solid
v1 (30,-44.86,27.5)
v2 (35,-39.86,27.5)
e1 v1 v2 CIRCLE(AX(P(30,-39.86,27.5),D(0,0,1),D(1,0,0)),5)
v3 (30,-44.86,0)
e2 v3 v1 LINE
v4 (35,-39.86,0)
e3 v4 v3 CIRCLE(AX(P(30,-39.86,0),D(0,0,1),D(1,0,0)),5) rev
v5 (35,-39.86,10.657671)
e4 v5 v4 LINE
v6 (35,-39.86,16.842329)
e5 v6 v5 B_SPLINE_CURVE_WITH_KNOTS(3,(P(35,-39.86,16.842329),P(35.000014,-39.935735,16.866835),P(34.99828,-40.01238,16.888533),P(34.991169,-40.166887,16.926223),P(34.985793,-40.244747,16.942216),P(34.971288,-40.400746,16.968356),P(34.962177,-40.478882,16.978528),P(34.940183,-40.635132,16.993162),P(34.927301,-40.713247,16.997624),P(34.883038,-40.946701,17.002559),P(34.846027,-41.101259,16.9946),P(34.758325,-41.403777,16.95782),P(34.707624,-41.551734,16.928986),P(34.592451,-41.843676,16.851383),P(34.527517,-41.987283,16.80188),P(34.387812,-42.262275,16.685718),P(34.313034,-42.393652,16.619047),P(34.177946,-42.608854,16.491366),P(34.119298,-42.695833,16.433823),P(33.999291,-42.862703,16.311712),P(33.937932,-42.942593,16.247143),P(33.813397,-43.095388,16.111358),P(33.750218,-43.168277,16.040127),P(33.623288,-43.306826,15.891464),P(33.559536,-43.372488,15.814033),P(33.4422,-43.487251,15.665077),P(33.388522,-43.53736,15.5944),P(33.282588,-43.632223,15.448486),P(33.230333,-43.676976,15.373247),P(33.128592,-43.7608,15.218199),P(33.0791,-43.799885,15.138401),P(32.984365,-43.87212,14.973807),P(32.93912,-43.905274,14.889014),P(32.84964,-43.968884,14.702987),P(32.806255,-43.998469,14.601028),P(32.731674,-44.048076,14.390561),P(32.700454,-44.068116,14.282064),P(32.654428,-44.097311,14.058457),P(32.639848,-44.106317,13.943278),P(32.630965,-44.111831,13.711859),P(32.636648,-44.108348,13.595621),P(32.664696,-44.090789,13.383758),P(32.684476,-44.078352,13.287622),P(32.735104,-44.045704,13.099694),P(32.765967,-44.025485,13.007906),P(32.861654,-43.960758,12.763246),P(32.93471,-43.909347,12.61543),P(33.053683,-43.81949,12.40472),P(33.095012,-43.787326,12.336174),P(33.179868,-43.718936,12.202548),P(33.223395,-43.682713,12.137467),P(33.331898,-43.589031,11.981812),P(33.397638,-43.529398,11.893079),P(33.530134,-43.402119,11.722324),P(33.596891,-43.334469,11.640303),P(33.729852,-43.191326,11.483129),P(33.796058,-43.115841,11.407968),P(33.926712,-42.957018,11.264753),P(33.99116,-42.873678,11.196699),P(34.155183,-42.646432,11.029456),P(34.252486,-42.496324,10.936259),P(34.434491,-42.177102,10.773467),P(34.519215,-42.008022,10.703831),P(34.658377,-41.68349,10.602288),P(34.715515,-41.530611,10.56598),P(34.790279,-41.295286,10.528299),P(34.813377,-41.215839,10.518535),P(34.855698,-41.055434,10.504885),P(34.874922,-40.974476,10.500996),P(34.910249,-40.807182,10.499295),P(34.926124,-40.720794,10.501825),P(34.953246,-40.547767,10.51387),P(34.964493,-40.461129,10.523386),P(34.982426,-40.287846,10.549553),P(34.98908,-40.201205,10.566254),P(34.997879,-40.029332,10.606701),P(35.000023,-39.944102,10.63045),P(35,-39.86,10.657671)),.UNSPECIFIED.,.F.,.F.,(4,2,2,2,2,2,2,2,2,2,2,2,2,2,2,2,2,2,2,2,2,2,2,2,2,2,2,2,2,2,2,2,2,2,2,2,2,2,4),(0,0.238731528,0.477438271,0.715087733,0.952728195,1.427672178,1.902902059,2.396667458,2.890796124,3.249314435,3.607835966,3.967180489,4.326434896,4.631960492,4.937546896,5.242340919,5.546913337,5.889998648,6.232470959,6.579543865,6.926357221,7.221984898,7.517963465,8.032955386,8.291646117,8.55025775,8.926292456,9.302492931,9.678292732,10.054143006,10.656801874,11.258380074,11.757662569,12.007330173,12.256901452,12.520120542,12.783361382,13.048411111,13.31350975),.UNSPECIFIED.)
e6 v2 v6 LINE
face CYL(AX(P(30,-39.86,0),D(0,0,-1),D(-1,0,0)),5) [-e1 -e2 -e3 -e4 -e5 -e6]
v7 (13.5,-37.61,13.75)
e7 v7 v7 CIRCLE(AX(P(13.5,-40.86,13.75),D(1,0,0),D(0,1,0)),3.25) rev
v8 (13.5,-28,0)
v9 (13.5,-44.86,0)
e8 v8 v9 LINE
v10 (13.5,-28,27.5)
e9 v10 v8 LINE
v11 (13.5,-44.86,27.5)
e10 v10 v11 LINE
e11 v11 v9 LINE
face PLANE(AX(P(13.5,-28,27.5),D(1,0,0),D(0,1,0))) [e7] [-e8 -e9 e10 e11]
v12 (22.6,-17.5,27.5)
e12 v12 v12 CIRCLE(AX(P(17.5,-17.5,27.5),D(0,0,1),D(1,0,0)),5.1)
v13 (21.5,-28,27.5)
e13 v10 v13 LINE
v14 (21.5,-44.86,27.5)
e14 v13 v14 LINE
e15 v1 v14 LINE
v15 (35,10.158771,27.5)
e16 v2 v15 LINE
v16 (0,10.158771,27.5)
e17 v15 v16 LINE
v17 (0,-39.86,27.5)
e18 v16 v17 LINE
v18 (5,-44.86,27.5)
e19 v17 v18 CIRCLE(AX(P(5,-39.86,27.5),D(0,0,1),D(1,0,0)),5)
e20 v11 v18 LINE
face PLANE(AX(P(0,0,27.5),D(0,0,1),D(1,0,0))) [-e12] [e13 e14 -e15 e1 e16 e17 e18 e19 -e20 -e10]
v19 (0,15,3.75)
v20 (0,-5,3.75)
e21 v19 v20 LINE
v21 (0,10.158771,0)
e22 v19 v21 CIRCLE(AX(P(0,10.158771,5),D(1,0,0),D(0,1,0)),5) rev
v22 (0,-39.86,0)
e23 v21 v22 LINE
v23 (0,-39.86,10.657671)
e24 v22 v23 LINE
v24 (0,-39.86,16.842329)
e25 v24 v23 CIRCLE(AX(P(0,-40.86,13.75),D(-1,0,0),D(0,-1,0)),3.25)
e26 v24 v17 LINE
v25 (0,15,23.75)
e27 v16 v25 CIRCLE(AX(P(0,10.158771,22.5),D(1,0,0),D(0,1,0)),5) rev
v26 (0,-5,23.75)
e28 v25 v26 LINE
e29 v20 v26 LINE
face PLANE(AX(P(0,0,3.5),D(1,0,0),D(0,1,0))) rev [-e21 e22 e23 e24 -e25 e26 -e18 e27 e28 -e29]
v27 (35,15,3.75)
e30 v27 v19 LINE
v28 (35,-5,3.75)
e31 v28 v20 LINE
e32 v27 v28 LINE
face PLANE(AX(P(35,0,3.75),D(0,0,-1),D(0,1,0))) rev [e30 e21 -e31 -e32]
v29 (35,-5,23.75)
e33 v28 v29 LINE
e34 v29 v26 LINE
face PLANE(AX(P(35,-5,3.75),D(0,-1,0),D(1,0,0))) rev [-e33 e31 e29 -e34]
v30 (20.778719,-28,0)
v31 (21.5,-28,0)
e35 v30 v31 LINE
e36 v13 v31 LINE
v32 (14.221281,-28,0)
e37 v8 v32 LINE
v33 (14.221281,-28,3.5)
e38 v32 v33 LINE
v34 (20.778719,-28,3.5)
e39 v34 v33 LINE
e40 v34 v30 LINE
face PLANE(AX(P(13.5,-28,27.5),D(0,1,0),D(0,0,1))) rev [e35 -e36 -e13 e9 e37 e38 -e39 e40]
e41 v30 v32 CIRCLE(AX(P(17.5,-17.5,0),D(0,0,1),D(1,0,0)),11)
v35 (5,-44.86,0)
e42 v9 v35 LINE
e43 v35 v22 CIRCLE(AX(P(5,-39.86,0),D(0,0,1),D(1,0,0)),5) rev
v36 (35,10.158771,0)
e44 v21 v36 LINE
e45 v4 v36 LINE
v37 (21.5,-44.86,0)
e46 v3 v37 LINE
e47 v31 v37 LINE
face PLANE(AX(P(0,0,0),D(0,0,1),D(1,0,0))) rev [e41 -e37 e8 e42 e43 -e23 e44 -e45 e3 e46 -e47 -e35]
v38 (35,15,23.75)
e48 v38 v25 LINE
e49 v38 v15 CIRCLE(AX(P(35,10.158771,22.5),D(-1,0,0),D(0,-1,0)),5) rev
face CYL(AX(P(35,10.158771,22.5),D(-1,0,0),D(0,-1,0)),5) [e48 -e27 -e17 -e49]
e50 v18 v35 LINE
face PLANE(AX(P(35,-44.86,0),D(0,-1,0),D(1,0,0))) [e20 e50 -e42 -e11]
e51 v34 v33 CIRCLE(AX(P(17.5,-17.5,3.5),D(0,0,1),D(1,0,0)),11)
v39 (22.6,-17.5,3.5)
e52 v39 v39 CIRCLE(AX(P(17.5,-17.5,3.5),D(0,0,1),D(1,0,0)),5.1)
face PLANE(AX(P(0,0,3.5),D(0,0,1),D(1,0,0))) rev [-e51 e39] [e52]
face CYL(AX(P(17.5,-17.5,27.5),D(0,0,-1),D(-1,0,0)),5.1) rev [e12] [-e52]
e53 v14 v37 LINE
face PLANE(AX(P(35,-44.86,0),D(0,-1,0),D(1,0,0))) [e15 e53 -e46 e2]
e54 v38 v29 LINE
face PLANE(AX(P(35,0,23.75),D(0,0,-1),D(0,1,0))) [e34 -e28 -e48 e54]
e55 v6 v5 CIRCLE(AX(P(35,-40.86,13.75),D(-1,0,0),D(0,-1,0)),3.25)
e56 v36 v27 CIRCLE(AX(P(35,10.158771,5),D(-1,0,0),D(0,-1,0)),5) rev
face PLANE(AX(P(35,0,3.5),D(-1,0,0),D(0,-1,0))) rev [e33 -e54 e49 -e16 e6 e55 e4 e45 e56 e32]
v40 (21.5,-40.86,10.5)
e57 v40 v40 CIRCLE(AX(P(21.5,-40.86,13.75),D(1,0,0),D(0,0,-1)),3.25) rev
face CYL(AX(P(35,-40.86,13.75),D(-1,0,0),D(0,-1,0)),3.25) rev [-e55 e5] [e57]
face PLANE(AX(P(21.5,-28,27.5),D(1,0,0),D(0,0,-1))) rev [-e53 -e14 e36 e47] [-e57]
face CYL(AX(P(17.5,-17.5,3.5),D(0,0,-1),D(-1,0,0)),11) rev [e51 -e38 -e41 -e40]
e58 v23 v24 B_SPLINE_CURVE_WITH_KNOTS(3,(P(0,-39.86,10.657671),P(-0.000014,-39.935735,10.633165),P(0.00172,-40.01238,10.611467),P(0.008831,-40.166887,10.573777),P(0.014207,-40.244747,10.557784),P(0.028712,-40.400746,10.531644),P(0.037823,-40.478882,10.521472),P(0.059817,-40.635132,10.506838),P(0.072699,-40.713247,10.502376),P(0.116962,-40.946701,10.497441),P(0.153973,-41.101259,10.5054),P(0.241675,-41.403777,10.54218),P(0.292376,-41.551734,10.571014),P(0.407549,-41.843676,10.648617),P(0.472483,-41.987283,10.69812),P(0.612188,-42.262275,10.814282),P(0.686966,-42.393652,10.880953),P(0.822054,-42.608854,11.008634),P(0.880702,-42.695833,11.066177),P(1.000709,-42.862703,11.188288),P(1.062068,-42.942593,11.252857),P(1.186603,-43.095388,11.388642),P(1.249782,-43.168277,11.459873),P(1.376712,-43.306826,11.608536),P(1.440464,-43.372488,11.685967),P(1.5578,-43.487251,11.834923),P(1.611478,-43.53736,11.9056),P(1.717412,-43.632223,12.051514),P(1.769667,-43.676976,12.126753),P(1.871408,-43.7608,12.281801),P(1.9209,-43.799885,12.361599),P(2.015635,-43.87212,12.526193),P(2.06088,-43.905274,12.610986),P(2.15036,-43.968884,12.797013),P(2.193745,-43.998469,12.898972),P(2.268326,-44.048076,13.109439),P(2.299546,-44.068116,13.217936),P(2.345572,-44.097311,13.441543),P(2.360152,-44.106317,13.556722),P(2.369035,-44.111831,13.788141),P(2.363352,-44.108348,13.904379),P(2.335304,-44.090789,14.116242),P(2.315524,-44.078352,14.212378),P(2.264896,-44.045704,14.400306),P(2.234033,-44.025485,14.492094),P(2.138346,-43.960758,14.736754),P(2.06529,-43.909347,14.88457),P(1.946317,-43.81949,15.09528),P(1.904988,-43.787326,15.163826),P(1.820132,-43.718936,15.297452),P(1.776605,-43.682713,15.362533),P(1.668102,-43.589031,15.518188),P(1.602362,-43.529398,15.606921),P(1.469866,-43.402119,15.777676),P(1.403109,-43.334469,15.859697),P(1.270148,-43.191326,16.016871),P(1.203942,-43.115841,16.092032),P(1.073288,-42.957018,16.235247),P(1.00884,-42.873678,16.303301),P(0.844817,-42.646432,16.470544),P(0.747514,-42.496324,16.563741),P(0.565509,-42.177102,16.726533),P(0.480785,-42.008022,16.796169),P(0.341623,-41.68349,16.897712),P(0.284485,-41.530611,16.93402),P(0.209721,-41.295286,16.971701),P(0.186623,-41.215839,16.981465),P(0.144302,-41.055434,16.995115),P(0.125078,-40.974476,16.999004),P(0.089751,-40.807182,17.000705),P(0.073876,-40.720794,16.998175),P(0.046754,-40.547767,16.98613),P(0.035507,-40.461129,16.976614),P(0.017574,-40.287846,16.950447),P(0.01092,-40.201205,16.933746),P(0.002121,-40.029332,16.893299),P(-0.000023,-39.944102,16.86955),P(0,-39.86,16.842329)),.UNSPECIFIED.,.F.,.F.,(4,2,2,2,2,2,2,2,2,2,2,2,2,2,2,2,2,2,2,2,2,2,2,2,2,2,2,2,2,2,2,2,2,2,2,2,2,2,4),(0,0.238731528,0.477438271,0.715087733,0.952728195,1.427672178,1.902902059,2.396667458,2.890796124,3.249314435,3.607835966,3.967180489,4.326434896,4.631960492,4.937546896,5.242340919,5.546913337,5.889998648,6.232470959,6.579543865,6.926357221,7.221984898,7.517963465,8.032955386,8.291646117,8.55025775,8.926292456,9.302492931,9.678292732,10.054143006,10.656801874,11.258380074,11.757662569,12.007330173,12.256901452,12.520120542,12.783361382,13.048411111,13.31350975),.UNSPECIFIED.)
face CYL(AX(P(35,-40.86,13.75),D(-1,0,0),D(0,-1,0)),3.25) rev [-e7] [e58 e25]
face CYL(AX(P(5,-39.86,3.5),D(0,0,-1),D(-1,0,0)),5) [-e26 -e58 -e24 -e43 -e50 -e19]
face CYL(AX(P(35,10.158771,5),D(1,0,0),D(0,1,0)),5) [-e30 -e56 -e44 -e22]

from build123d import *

# Parameters (mm, degrees)
CROQUIS1_W              = 35
CROQUIS1_H              = 35
CROQUIS1_R              = 11
ENTRADABASE_DEPTH       = 3.5
CROQUIS2_W              = 35
CROQUIS2_H              = 35
CROQUIS2_R              = 5.1
ENTRADACAVIDAD_DEPTH    = 24
REDONDEO1_R             = 5
CROQUIS4_W              = 27.5
CROQUIS4_H              = 14.86
CROQUIS4_R              = 3.25
BARRENORODAMIENTO_DEPTH = 35
CROQUIS5_W              = 8
CROQUIS5_H              = 16.86
ENTRADARODAMIENTO_DEPTH = 64.195487181
DETALLE2_R              = 5
CROQUIS10_W             = 3.75
CROQUIS10_H             = 15
SALIENTE_EXTRUIR4_DEPTH = 35
REDONDEO5_R             = 5
CROQUIS11_W             = 20
CROQUIS11_H             = 20
CORTAR_EXTRUIR5_DEPTH   = 64.195487351


with BuildPart() as part:
    # Croquis1 → EntradaBase (new body)
    with BuildSketch(Plane.XY):
        with Locations((17.5, -17.5)):
            Rectangle(CROQUIS1_W, CROQUIS1_H)
        with Locations((17.5, -17.5)):
            Circle(CROQUIS1_R, mode=Mode.SUBTRACT)
    extrude(amount=ENTRADABASE_DEPTH)

    # Croquis2 → EntradaCavidad (add)
    with BuildSketch(Plane.XY.offset(3.5)):
        with Locations((17.5, -17.5)):
            Rectangle(CROQUIS2_W, CROQUIS2_H)
        with Locations((17.5, -17.5)):
            Circle(CROQUIS2_R, mode=Mode.SUBTRACT)
    extrude(amount=ENTRADACAVIDAD_DEPTH)

    # Redondeo1
    redondeo1_edges = [part.edges().sort_by_distance(p)[0] for p in [
        (35, -35, 13.75),
        (0, -35, 13.75),
    ]]
    fillet(redondeo1_edges, radius=REDONDEO1_R)

    # Croquis4 → BarrenoRodamiento (add, through all)
    with BuildSketch(Plane.ZY):
        with Locations((13.75, -37.43)):
            Rectangle(CROQUIS4_W, CROQUIS4_H)
        with Locations(Location((13.75, -40.86, 0), (0, 0, 270))):
            Circle(CROQUIS4_R, mode=Mode.SUBTRACT)
    extrude(amount=-BARRENORODAMIENTO_DEPTH)

    # Croquis5 → EntradaRodamiento (cut, through all)
    with BuildSketch(Plane(origin=(0, 0, 0), x_dir=(-1, 0, 0), z_dir=(0, 0, -1))):
        with Locations((-17.5, -36.43)):
            Rectangle(CROQUIS5_W, CROQUIS5_H)
    extrude(amount=-ENTRADARODAMIENTO_DEPTH, mode=Mode.SUBTRACT)

    # Detalle2
    # the kernel refuses this fillet: 5 mm, written as the material it takes off along each edge
    with BuildSketch(Plane(origin=(35, -44.86, -12.5), x_dir=(-1, 0, 0), z_dir=(0, 0, 1))) as detalle2_piece_1:
        with BuildLine():
            CenterArc((DETALLE2_R, -DETALLE2_R), DETALLE2_R, 90, 90)
            Line((0, -DETALLE2_R), (0, 0))
            Line((0, 0), (DETALLE2_R, 0))
        make_face()
    extrude(amount=52.5, mode=Mode.SUBTRACT)
    with BuildSketch(Plane(origin=(0, -44.86, -12.5), x_dir=(1, 0, 0), z_dir=(0, 0, 1))) as detalle2_piece_2:
        with BuildLine():
            CenterArc((DETALLE2_R, DETALLE2_R), DETALLE2_R, 180, 90)
            Line((0, DETALLE2_R), (0, 0))
            Line((0, 0), (DETALLE2_R, 0))
        make_face()
    extrude(amount=52.5, mode=Mode.SUBTRACT)

    # Croquis10 → Saliente-Extruir4 (add, through all)
    with BuildSketch(Plane.ZY):
        with Locations((1.875, 7.5)):
            Rectangle(CROQUIS10_W, CROQUIS10_H)
        with Locations((25.625, 7.5)):
            Rectangle(CROQUIS10_W, CROQUIS10_H)
    extrude(amount=-SALIENTE_EXTRUIR4_DEPTH)

    # Redondeo5
    # the kernel refuses this fillet: 5 mm, written as the material it takes off along each edge
    with BuildSketch(Plane(origin=(-12.103072957, 15, 0), x_dir=(0, -1, 0), z_dir=(1, 0, 0))) as redondeo5_piece_1:
        with BuildLine():
            CenterArc((4.841229183, -5), REDONDEO5_R, 90, 75.522487814)
            Line((0, -3.75), (-0.096824584, -3.725))
            ThreePointArc((-0.096824584, -3.725), (-0.1, -1.875), (-0.1, 0))
            Line((-0.1, 0), (0, 0.1))
            Line((0, 0.1), (4.841229183, 0.1))
            Line((4.841229183, 0.1), (4.841229183, 0))
        make_face()
    extrude(amount=59.206145914, mode=Mode.SUBTRACT)
    with BuildSketch(Plane(origin=(-12.103072957, 15, 27.5), x_dir=(0, -1, 0), z_dir=(1, 0, 0))) as redondeo5_piece_2:
        with BuildLine():
            CenterArc((4.841229183, 5), REDONDEO5_R, 194.477512186, 75.522487814)
            Line((0, 3.75), (-0.096824584, 3.725))
            ThreePointArc((-0.096824584, 3.725), (-0.1, 1.875), (-0.1, 0))
            Line((-0.1, 0), (0, -0.1))
            Line((0, -0.1), (4.841229183, -0.1))
            Line((4.841229183, -0.1), (4.841229183, 0))
        make_face()
    extrude(amount=59.206145914, mode=Mode.SUBTRACT)

    # Croquis11 → Cortar-Extruir5 (cut, through all)
    with BuildSketch(Plane.ZY):
        with Locations((13.75, 5)):
            Rectangle(CROQUIS11_W, CROQUIS11_H)
    extrude(amount=-CORTAR_EXTRUIR5_DEPTH, mode=Mode.SUBTRACT)


solid = part.part
